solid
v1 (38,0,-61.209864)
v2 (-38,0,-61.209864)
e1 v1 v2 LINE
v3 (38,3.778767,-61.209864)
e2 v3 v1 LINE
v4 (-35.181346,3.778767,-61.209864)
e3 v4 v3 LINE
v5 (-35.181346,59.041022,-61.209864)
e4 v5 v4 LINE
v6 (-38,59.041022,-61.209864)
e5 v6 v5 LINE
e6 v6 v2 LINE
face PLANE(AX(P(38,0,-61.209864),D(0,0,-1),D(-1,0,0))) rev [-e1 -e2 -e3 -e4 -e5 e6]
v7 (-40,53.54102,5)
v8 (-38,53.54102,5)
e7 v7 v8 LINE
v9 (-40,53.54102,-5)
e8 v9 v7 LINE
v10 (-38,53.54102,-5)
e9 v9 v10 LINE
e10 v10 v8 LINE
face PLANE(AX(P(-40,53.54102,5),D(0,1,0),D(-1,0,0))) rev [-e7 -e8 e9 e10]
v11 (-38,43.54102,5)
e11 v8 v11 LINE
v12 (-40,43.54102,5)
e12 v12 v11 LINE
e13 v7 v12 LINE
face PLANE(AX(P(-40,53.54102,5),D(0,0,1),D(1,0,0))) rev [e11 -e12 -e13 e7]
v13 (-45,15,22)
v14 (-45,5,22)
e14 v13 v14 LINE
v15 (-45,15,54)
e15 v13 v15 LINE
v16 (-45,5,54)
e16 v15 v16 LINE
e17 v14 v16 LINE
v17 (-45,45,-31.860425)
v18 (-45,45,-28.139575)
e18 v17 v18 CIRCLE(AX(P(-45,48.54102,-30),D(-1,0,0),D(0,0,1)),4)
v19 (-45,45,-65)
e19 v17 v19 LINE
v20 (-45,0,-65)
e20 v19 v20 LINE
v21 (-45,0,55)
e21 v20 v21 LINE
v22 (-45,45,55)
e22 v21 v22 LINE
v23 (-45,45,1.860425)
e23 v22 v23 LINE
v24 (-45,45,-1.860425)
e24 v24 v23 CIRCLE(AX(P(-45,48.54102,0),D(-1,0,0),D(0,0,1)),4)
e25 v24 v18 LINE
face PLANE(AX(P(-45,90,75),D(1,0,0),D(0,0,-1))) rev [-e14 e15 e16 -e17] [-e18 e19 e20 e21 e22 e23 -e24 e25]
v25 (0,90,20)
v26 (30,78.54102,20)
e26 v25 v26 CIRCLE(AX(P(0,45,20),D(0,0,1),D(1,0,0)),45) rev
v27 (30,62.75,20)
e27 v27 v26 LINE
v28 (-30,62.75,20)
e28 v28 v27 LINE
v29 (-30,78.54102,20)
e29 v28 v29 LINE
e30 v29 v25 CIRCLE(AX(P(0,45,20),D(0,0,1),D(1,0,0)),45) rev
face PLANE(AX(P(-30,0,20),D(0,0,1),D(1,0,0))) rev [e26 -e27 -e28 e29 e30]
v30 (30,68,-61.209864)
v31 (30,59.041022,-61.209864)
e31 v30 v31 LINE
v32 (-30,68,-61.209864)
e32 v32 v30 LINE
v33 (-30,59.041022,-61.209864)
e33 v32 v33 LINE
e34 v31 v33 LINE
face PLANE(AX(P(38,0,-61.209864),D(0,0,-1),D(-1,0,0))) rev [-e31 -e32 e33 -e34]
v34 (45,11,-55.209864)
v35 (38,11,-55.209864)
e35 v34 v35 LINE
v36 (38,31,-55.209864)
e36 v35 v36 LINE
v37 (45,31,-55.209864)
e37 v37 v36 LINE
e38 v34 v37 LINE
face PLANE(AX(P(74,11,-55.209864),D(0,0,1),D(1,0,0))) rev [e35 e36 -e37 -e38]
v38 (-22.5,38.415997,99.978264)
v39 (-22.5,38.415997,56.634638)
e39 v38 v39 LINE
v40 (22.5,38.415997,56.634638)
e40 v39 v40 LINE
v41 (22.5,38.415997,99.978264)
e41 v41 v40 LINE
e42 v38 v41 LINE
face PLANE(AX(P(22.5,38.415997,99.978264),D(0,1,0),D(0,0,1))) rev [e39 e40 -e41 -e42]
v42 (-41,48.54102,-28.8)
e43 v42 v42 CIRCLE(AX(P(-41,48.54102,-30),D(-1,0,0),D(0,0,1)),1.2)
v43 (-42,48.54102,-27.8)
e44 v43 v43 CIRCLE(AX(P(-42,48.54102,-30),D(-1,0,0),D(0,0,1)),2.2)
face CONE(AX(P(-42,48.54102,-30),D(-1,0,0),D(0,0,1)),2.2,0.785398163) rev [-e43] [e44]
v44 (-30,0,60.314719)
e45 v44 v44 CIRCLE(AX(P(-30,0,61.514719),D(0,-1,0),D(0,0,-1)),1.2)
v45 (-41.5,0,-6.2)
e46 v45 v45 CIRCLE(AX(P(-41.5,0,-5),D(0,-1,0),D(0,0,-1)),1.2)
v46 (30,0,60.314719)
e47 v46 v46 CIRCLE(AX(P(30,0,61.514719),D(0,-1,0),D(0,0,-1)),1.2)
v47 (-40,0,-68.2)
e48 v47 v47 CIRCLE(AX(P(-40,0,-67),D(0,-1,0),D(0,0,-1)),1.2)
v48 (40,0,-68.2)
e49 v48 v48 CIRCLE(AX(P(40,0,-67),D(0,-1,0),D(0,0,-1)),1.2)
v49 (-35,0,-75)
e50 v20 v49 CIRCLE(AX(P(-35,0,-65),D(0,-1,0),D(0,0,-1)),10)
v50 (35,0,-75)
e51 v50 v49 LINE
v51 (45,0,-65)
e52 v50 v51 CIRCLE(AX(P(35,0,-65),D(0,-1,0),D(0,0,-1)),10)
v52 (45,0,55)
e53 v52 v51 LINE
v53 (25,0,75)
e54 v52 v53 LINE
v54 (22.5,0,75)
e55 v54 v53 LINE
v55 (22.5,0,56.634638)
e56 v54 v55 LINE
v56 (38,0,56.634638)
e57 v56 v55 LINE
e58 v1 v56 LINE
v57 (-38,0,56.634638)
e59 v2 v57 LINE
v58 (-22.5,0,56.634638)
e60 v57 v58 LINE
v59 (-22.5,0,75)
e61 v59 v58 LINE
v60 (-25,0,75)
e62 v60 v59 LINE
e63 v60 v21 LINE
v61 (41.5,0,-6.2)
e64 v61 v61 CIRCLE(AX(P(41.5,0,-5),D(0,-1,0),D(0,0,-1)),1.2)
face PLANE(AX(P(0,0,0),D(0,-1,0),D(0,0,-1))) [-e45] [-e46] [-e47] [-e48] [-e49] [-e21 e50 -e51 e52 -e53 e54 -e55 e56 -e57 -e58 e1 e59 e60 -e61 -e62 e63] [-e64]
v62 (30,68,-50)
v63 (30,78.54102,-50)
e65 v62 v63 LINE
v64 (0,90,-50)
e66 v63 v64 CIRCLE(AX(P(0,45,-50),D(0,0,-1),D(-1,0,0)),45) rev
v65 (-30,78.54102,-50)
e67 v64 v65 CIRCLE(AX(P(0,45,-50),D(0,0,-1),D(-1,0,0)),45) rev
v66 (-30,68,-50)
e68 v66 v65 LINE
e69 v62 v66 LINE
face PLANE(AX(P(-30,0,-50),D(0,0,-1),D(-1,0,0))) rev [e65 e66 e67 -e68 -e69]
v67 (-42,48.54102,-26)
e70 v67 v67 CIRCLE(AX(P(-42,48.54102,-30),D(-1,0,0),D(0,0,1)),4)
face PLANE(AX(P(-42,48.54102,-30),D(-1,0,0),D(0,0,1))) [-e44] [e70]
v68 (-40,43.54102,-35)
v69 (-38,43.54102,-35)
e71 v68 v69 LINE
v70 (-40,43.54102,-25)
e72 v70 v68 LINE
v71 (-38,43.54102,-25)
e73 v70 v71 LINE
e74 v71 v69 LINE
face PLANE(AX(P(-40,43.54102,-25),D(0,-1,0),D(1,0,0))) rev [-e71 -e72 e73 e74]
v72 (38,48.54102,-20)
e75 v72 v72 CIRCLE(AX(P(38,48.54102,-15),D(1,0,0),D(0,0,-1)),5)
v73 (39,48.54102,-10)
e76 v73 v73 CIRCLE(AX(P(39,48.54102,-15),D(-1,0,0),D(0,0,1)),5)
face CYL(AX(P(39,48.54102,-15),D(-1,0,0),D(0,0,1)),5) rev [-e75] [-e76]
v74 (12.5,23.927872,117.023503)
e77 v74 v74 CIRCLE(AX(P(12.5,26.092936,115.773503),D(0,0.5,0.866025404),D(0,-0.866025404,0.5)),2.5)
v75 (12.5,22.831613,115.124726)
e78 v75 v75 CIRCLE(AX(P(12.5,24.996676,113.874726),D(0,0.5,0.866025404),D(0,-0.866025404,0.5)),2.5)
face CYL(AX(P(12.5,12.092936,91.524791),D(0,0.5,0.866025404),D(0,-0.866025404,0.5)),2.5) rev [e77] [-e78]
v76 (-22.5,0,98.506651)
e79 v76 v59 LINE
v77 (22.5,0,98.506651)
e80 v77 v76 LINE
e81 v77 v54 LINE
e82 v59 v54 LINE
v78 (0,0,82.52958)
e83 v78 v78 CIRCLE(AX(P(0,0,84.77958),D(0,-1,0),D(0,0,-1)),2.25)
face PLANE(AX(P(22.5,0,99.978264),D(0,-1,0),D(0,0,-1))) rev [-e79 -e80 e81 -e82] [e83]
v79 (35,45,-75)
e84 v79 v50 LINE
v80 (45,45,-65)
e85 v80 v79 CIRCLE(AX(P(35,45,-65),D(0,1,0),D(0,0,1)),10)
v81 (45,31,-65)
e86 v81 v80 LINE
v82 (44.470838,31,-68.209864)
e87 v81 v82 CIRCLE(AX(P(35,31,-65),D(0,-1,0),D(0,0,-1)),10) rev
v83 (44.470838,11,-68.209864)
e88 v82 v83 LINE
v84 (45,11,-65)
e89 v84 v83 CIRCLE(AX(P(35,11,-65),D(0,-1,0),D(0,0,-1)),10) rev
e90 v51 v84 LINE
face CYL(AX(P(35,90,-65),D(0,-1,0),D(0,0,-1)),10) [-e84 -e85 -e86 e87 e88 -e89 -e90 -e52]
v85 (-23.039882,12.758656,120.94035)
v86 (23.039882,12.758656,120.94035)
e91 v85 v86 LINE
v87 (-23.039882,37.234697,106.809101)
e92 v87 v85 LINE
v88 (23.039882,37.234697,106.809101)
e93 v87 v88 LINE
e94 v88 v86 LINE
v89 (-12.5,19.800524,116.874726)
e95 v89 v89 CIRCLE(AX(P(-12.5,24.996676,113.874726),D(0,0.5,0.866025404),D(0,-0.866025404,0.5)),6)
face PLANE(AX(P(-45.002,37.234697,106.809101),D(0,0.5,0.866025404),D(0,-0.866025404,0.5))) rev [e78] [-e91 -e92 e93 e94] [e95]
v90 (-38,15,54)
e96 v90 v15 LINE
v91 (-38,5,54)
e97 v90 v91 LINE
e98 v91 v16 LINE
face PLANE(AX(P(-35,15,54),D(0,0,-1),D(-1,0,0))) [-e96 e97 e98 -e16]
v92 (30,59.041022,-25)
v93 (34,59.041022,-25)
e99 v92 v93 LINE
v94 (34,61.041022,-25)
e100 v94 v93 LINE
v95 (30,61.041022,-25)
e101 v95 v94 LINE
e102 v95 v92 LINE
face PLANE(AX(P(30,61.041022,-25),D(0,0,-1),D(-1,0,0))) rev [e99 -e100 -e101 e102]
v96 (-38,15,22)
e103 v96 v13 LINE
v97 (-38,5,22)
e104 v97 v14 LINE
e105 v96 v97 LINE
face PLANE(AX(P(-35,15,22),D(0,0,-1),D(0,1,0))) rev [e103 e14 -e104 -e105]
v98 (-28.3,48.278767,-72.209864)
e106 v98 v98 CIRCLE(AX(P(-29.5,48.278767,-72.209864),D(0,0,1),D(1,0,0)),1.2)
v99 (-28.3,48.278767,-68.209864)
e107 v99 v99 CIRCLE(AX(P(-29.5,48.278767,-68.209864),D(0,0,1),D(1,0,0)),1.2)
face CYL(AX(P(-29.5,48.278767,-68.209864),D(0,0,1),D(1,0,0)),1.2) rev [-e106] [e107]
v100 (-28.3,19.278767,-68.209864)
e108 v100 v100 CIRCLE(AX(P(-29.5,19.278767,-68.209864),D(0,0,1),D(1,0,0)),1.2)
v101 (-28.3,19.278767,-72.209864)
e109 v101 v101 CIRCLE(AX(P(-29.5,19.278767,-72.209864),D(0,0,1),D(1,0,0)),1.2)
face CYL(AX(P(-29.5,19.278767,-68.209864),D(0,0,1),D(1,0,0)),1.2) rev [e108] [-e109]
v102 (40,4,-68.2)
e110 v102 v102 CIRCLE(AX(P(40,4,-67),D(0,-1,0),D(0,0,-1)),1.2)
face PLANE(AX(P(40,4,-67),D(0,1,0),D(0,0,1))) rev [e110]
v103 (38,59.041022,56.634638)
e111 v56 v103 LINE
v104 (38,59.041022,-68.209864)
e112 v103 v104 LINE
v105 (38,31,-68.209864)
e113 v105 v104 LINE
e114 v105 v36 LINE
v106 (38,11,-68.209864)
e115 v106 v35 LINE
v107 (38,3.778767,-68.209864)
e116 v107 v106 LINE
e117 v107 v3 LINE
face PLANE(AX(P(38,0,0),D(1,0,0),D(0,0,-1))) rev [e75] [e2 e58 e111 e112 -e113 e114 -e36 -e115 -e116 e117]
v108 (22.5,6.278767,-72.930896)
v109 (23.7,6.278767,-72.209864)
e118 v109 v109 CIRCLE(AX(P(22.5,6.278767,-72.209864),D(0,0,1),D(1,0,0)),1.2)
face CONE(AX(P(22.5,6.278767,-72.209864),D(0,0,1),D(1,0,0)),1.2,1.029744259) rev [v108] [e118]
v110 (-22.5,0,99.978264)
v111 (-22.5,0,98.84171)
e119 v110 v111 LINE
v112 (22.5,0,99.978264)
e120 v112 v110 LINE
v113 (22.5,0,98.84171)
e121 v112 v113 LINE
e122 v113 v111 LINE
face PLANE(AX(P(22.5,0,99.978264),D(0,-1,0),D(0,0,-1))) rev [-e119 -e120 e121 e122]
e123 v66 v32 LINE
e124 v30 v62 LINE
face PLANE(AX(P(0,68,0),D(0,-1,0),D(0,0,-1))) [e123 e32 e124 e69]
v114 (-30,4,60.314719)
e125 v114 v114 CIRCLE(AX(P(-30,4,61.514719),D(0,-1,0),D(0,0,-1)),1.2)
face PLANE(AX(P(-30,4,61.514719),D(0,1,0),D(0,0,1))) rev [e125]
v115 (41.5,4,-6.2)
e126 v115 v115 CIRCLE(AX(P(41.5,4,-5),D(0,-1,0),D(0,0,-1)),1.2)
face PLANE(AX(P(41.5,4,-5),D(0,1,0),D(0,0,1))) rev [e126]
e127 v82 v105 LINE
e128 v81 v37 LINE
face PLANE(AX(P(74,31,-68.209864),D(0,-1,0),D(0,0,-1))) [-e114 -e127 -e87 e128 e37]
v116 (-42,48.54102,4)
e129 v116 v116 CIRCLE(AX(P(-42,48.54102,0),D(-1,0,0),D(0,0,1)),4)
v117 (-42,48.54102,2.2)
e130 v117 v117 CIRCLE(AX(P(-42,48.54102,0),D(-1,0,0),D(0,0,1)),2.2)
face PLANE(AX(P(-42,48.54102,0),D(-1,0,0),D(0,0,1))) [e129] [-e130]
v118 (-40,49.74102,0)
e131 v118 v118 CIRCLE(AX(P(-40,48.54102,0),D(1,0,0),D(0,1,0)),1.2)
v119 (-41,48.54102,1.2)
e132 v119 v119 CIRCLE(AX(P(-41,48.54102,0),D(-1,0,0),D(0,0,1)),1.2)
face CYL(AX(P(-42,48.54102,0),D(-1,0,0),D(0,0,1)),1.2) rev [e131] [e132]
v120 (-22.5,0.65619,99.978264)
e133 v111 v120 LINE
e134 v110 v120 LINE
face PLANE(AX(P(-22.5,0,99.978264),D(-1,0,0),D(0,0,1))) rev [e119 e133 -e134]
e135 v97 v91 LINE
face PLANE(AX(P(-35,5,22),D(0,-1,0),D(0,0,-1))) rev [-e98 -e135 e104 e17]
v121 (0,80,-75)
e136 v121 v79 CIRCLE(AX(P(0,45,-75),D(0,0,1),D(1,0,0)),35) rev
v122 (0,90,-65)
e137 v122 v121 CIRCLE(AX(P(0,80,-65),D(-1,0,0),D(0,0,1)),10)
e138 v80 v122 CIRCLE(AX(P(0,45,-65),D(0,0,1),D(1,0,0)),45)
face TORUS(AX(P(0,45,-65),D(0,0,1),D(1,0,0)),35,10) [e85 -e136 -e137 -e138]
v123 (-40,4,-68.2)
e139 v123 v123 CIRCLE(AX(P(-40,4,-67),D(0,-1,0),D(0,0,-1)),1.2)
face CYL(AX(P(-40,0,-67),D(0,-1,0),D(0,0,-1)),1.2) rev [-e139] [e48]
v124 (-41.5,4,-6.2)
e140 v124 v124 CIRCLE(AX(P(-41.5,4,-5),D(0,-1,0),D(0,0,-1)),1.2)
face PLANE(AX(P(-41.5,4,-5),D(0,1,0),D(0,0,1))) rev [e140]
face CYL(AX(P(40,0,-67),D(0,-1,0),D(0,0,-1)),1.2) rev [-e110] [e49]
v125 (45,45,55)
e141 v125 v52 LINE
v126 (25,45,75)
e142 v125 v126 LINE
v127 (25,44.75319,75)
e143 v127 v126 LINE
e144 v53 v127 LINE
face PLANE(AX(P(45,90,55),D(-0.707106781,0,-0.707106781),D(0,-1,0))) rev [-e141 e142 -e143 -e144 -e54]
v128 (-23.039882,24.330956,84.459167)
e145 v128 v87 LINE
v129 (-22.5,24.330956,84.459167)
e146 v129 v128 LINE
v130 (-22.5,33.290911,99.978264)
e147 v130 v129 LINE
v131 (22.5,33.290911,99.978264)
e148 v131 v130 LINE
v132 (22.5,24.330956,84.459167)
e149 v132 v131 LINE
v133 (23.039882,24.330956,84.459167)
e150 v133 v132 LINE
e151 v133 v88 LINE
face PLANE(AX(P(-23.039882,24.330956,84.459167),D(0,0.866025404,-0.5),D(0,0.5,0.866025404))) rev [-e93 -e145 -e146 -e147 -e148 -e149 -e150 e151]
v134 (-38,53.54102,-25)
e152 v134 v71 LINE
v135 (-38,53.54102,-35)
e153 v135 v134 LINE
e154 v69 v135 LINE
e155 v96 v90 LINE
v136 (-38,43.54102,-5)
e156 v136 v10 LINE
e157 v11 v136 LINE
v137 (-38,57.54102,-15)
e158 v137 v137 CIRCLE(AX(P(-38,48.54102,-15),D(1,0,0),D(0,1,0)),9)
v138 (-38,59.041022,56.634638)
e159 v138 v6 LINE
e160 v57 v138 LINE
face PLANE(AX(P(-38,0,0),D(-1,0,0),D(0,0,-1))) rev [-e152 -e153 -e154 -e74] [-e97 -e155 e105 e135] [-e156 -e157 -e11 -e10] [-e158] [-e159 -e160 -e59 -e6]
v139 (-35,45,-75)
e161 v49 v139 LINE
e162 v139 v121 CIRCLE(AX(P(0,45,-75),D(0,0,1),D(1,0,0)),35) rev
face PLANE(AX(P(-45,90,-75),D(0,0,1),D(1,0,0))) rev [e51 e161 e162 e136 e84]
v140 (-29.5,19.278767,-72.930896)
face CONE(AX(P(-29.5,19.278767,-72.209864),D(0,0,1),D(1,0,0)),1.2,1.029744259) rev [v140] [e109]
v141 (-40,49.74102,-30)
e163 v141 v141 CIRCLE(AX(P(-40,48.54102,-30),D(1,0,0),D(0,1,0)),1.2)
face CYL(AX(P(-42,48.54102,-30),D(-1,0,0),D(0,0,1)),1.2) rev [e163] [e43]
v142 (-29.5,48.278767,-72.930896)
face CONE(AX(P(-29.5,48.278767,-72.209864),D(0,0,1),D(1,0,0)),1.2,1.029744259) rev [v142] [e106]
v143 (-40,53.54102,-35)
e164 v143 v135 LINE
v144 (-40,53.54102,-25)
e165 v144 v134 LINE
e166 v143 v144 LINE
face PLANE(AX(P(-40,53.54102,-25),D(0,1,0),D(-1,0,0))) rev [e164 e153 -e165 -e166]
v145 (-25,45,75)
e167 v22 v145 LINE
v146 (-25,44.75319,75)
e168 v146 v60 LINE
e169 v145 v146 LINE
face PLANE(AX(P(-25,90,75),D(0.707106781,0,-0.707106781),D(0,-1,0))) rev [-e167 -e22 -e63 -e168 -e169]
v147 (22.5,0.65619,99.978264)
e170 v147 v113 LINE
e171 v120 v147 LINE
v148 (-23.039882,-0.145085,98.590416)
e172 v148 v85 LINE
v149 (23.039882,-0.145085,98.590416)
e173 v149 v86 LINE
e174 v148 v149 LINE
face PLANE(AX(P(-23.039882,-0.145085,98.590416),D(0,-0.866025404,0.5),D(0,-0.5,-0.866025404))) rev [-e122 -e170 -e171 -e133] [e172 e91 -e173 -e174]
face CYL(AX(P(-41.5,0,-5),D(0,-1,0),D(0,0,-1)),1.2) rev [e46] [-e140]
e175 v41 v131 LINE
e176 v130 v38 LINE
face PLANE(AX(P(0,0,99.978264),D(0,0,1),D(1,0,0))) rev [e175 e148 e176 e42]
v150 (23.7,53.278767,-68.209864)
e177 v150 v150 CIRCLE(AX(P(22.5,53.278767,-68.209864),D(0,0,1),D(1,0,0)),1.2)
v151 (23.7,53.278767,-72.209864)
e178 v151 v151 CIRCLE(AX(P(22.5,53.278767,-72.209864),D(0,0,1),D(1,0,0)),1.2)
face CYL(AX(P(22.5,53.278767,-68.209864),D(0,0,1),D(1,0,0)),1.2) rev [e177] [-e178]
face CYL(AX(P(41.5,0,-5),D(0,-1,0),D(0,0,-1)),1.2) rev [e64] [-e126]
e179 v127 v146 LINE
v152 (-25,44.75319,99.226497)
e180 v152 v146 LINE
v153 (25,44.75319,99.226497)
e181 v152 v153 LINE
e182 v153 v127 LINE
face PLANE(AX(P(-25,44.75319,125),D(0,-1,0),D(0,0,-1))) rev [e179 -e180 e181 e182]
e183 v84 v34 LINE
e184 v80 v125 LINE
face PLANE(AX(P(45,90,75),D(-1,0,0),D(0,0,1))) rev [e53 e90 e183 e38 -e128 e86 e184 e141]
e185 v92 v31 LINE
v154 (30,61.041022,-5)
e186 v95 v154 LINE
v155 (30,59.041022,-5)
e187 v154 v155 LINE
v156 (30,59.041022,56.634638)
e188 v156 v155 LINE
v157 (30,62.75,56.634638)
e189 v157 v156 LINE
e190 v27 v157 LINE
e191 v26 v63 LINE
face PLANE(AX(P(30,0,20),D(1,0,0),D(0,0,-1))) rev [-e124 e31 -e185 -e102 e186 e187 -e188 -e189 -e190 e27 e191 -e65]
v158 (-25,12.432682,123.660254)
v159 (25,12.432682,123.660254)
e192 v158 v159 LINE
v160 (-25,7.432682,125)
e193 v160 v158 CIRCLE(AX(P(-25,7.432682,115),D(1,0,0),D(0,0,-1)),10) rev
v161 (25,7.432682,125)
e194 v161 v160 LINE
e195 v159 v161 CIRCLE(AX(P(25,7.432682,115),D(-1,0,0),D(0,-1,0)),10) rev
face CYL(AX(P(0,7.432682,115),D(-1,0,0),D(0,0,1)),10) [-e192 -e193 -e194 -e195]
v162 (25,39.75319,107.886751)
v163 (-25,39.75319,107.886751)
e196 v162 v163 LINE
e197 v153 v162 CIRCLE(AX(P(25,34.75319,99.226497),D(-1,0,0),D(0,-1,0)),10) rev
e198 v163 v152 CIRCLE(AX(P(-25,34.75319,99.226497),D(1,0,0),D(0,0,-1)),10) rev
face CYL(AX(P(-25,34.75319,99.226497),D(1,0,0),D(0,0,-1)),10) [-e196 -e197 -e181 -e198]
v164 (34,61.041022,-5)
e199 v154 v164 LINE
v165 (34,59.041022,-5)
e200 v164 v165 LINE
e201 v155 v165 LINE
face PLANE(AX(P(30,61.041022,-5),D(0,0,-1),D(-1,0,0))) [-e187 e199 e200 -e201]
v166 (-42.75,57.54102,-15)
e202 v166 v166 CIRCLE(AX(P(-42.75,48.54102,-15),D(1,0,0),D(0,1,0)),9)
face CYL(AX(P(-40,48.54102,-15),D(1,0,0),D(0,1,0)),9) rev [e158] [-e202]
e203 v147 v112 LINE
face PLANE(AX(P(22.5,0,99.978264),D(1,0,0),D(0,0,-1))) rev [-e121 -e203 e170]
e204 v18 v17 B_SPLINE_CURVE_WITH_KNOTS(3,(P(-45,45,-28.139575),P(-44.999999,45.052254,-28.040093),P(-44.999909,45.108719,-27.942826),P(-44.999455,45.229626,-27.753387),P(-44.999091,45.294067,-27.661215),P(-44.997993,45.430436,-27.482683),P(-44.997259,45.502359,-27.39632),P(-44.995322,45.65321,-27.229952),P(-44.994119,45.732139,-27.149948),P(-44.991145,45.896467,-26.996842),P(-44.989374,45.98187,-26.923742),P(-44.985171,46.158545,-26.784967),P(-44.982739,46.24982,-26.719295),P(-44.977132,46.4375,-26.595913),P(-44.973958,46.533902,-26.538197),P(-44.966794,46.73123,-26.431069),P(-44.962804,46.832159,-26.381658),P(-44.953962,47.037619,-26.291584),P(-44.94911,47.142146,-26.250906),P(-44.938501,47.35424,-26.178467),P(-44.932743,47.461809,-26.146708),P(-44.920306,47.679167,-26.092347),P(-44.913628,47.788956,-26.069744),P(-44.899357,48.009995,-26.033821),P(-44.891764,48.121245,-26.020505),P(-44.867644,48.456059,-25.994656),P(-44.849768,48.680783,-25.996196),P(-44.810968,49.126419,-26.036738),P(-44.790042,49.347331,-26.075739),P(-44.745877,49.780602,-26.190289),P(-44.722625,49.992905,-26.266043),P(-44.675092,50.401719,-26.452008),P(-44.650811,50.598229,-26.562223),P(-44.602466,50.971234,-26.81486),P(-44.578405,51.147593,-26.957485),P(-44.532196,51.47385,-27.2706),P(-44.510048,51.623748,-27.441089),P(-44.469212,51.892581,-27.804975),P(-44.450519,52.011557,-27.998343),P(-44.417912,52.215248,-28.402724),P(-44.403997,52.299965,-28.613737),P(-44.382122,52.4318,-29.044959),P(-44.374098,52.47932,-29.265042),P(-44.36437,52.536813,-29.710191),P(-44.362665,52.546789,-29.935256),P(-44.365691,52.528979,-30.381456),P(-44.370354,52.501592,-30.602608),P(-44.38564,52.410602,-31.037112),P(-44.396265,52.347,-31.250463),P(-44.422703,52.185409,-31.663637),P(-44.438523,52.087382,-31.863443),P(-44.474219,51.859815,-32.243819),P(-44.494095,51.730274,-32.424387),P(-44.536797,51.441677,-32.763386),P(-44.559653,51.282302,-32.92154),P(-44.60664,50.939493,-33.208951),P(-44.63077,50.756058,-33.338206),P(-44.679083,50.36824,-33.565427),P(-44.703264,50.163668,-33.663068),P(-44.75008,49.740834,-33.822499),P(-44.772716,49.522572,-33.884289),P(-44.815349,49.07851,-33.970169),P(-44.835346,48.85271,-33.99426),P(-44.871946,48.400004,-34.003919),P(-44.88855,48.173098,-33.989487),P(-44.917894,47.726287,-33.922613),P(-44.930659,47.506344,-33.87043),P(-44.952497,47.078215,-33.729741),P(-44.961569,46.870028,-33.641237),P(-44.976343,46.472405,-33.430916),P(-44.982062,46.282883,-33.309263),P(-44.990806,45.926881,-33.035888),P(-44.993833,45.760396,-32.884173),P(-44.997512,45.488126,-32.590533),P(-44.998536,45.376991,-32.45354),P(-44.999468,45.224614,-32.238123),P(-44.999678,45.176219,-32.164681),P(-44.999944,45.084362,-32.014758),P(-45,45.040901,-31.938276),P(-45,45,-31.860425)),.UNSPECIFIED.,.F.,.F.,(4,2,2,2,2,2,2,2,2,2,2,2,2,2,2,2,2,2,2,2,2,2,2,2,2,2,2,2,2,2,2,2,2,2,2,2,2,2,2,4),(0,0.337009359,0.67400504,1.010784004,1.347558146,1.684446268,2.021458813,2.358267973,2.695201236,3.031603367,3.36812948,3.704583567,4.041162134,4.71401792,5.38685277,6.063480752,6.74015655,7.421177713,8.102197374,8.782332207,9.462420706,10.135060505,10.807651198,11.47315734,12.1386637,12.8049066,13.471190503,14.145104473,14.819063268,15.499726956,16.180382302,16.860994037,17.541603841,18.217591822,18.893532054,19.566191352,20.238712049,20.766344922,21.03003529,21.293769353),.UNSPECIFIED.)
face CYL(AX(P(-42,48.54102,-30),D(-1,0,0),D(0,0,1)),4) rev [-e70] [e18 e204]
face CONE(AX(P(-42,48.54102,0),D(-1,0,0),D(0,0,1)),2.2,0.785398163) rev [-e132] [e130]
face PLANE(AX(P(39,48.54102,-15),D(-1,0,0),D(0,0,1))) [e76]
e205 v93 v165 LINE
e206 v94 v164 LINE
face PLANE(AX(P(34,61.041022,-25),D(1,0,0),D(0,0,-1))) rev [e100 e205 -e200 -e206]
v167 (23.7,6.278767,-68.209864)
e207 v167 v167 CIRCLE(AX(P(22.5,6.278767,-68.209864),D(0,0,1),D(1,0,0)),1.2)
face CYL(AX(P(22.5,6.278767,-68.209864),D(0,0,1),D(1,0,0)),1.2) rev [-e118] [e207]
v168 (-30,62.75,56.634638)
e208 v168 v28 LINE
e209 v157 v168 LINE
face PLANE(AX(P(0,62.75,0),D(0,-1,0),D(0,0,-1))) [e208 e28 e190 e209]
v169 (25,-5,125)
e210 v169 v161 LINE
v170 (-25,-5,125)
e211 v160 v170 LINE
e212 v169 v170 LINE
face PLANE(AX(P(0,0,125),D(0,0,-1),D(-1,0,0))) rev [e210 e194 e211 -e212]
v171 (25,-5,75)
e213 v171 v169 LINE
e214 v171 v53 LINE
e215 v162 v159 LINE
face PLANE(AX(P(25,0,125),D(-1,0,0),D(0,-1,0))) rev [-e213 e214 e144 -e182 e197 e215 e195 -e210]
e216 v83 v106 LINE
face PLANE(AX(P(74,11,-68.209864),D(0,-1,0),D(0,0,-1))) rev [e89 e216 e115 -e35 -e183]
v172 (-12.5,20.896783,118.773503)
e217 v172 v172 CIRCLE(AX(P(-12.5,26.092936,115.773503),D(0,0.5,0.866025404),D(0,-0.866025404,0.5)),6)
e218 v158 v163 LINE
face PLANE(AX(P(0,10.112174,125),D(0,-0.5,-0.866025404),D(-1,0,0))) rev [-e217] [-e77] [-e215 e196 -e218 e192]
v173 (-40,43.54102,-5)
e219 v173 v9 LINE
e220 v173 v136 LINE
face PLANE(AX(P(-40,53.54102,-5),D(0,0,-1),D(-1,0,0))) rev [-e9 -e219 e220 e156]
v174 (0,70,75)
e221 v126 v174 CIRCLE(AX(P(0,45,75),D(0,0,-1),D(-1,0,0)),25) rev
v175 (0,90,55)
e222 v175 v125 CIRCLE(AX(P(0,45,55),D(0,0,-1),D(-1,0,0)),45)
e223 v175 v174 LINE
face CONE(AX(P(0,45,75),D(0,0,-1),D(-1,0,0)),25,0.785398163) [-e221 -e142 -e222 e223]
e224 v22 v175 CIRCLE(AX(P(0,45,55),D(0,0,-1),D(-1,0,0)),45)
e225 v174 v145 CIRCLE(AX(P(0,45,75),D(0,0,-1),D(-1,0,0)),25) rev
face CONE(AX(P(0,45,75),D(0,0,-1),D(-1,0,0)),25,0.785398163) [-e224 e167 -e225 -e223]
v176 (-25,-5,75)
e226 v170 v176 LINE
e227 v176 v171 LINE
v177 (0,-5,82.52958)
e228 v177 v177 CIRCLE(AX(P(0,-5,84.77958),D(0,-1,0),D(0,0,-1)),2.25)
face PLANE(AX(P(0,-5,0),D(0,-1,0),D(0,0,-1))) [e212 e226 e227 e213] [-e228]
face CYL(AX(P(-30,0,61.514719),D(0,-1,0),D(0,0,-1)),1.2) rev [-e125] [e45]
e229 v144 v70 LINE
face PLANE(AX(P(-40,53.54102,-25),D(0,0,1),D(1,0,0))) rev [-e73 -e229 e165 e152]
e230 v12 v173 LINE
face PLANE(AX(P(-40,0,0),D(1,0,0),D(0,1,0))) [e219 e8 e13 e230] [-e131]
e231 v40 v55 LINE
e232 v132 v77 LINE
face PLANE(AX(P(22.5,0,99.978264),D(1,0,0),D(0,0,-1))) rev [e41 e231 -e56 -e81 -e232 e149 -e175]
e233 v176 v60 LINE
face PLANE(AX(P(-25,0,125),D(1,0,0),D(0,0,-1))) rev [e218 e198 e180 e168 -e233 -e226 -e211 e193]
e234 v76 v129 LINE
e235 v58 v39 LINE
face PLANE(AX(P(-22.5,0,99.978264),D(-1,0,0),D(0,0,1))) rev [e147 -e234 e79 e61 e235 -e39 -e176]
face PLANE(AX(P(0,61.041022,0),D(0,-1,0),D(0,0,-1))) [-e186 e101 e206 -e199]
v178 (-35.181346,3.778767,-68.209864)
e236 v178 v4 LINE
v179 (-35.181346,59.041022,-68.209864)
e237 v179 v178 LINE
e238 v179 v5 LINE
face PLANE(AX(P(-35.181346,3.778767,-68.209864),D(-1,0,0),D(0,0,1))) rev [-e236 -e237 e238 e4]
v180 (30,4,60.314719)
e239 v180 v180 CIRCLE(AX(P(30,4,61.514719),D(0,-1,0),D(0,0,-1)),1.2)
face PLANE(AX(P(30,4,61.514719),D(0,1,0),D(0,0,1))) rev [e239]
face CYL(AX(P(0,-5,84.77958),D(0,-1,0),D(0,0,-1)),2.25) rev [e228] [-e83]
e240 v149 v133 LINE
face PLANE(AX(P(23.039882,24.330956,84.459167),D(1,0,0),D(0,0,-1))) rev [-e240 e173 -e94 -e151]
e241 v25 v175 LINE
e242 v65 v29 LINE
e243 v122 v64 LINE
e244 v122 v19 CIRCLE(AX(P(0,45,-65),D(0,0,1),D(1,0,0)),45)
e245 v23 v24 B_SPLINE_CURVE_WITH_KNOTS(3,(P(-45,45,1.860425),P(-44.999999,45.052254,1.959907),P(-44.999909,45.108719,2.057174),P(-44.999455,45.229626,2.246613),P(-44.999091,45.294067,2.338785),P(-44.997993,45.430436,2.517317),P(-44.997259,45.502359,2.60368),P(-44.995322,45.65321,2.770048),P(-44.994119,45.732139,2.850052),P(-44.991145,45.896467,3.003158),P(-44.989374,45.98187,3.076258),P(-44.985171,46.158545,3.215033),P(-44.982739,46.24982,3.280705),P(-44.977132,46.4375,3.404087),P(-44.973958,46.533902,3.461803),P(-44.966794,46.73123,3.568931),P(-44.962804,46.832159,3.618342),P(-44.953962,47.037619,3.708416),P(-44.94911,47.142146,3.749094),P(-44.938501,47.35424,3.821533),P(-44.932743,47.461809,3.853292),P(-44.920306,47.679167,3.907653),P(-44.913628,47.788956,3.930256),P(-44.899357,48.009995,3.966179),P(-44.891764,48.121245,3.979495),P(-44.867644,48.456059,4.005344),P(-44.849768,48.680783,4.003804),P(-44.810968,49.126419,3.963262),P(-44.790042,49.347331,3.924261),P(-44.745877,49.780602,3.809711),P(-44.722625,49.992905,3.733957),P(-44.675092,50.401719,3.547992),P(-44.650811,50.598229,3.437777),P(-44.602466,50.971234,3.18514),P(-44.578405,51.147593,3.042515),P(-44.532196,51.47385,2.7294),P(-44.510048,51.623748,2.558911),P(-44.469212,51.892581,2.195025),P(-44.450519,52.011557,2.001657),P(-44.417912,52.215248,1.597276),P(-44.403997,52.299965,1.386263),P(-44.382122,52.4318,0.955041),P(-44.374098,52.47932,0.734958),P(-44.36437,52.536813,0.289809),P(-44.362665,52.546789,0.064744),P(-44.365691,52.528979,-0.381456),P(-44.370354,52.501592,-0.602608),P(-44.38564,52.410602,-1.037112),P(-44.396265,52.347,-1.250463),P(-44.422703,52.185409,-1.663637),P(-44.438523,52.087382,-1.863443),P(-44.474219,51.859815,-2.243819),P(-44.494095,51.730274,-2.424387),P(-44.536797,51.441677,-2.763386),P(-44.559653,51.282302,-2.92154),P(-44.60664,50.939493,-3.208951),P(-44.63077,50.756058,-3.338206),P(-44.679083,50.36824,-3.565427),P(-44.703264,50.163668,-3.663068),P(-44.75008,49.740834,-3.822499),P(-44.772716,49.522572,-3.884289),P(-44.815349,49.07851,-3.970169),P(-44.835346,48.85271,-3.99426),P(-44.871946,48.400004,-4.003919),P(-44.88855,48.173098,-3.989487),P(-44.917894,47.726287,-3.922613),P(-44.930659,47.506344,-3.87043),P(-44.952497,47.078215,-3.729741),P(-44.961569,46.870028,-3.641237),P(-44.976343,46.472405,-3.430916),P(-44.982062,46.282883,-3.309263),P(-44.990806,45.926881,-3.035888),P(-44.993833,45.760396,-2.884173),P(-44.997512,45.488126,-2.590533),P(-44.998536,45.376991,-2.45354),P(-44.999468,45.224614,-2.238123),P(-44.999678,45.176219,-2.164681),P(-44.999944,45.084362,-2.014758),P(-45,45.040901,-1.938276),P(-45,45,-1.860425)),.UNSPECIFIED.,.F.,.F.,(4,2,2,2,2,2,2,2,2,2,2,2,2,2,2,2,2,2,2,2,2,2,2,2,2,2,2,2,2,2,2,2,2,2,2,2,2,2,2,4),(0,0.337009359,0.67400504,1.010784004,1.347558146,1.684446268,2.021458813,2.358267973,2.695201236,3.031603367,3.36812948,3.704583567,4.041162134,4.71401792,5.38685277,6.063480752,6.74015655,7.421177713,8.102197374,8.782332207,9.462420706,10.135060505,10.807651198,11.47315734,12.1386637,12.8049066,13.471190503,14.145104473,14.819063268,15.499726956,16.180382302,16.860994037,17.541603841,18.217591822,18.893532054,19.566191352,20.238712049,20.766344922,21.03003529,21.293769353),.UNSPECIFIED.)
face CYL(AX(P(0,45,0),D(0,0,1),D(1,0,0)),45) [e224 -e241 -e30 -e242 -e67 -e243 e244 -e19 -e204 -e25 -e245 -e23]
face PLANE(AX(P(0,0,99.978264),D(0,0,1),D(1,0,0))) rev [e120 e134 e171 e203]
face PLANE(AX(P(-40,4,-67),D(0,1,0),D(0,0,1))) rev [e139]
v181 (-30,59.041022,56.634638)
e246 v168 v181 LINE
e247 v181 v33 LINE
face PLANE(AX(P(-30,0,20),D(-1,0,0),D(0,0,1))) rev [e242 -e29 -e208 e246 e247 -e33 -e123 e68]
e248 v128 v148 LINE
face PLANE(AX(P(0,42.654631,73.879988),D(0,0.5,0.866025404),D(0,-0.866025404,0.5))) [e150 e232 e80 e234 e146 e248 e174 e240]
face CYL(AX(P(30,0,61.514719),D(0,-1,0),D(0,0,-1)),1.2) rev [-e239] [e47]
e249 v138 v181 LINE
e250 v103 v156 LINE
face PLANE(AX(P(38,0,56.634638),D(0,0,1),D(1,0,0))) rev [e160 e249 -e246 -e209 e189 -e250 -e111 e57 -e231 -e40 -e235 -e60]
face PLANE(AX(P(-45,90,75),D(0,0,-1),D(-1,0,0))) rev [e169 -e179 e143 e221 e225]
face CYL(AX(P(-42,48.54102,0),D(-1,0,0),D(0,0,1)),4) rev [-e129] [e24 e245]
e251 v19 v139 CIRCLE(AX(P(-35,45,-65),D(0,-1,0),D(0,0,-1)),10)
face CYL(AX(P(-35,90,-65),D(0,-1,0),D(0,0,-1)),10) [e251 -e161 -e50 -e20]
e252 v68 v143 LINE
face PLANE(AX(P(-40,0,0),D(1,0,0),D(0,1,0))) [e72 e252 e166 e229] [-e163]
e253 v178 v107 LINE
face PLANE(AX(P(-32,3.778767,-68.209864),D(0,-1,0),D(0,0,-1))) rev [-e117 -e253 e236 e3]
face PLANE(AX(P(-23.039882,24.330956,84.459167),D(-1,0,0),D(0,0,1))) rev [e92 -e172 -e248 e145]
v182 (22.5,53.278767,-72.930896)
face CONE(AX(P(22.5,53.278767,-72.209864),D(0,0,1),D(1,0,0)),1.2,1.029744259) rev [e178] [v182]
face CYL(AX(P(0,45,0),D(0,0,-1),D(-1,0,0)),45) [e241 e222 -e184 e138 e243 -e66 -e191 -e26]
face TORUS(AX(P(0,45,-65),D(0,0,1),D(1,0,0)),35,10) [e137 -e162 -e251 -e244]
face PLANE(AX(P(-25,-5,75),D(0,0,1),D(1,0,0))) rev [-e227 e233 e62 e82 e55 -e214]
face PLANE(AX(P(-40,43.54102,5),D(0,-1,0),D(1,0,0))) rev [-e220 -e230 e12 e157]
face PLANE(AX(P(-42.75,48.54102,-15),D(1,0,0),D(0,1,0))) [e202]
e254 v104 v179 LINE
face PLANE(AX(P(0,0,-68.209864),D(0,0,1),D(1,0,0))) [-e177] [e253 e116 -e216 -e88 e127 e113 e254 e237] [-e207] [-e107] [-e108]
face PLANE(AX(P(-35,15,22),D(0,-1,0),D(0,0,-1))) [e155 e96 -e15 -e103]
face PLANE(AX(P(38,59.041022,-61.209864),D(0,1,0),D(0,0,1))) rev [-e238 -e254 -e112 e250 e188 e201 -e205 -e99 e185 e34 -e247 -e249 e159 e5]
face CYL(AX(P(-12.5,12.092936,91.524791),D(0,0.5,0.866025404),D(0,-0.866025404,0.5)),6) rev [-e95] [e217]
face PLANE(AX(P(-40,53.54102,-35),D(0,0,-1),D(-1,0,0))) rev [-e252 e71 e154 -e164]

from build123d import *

# Parameters (mm, degrees)
SCHIZZO1_W                             = 90
SCHIZZO1_H                             = 150
ESTRUSIONE_ESTRUSIONE1_DEPTH           = 90
SCHIZZO4_W                             = 60
SCHIZZO4_H                             = 70
TAGLIO_ESTRUSIONE2_DEPTH               = 90
RACCORDO5_R                            = 45
RACCORDO6_R                            = 45
SMUSSO2_SIZE                           = 20
SCHIZZO7_W                             = 50
SCHIZZO7_H                             = 44.753189799
ESTRUSIONE_ESTRUSIONE2_DEPTH           = 50
SMUSSO3_SIZE                           = 20
SMUSSO3_SIZE2                          = 34.641016151
RACCORDO7_R                            = 10
RACCORDO8_R                            = 10
SCHIZZO9_W                             = 50
SCHIZZO9_H                             = 50
ESTRUSIONE_ESTRUSIONE3_DEPTH           = 5
RACCORDO9_R                            = 10
SCHIZZO13_W                            = 45
SCHIZZO13_H                            = 38.415996799
TAGLIO_ESTRUSIONE3_DEPTH               = 79.978264331
SCHIZZO14_W                            = 117.844501366
SCHIZZO14_H                            = 59.041021869
TAGLIO_ESTRUSIONE4_DEPTH               = 8
SCHIZZO18_R                            = 5
TAGLIO_ESTRUSIONE5_DEPTH               = 9
SCHIZZO16_W                            = 4
SCHIZZO16_H                            = 20
TAGLIO_ESTRUSIONE7_DEPTH               = 2
SCHIZZO23_W                            = 76
SCHIZZO23_H                            = 117.844501366
TAGLIO_ESTRUSIONE8_DEPTH               = 38
FORO_PER_VITE_M2_2_D                   = 2.4
FORO_PER_VITE_M2_2_DEPTH               = 4
FORO_PER_VITE_M4_1_D                   = 4.5
FORO_PER_VITE_M4_1_DEPTH               = 10
SCHIZZO29_W                            = 60
SCHIZZO29_H                            = 11.209863528
TAGLIO_ESTRUSIONE9_DEPTH               = 30
SCHIZZO30_W                            = 70
SCHIZZO30_H                            = 52
TAGLIO_ESTRUSIONE10_DEPTH              = 7
FORO_PER_VITE_M2_3_D                   = 2.4
FORO_PER_VITE_M2_3_DEPTH               = 4
FORO_PER_VITE_M2_3_TIP                 = 0.721032743
SCHIZZO33_W                            = 13
SCHIZZO33_H                            = 20
TAGLIO_ESTRUSIONE11_DEPTH              = 36
SCHIZZO36_W                            = 46.07976418
SCHIZZO36_H                            = 28.262497783
TAGLIO_ESTRUSIONE12_DEPTH              = 28
ESTRUSIONE_ESTRUSIONE4_REACH           = 170.388
SCHIZZO38_R                            = 6
SCHIZZO38_R_2                          = 2.5
TAGLIO_ESTRUSIONE13_DEPTH              = 28
SCHIZZO39_R                            = 9
SCHIZZO39_W                            = 10
SCHIZZO39_H                            = 10
TAGLIO_ESTRUSIONE14_DEPTH              = 2
SCHIZZO40_W                            = 32
SCHIZZO40_H                            = 10
TAGLIO_ESTRUSIONE15_DEPTH              = 10
SCHIZZO42_R                            = 4
TAGLIO_ESTRUSIONE16_DEPTH              = 3
FORO_SVASATO_PER_VITE_M2_3_D           = 2.4
FORO_SVASATO_PER_VITE_M2_3_DEPTH       = 6
FORO_SVASATO_PER_VITE_M2_3_CSINK_D     = 4.4
FORO_SVASATO_PER_VITE_M2_3_CSINK_ANGLE = 90
FORO_SVASATO_PER_VITE_M2_3_TIP         = 0.721032743
TAGLIO_ESTRUSIONE18_DEPTH              = 7
SCHIZZO53_R                            = 9
TAGLIO_ESTRUSIONE19_DEPTH              = 2.75
SCHIZZO54_W                            = 60
SCHIZZO54_H                            = 36.634637838
TAGLIO_ESTRUSIONE20_DEPTH              = 24.75


with BuildPart() as part:
    # Schizzo1 → Estrusione-Estrusione1 (new body)
    with BuildSketch(Plane(origin=(0, 0, 0), x_dir=(1, 0, 0), z_dir=(0, 1, 0))):
        Rectangle(SCHIZZO1_W, SCHIZZO1_H)
    extrude(amount=ESTRUSIONE_ESTRUSIONE1_DEPTH)

    # Schizzo4 → Taglio-Estrusione2 (cut)
    with BuildSketch(Plane(origin=(0, 90, 0), x_dir=(1, 0, 0), z_dir=(0, 1, 0))):
        with Locations((0, 15)):
            Rectangle(SCHIZZO4_W, SCHIZZO4_H)
    extrude(amount=-TAGLIO_ESTRUSIONE2_DEPTH, mode=Mode.SUBTRACT)

    # Raccordo5
    # the kernel refuses this fillet: 45 mm, written as the material it takes off along each edge
    with BuildSketch(Plane(origin=(-45, 90, -187.5), x_dir=(0, -1, 0), z_dir=(0, 0, 1))) as raccordo5_piece_1:
        with BuildLine():
            CenterArc((RACCORDO5_R, RACCORDO5_R), RACCORDO5_R, 180, 90)
            Line((0, RACCORDO5_R), (0, 0))
            Line((0, 0), (RACCORDO5_R, 0))
        make_face()
    extrude(amount=375, mode=Mode.SUBTRACT)

    # Raccordo6
    # the kernel refuses this fillet: 45 mm, written as the material it takes off along each edge
    with BuildSketch(Plane(origin=(45, 90, 187.5), x_dir=(0, -1, 0), z_dir=(0, 0, -1))) as raccordo6_piece_1:
        with BuildLine():
            CenterArc((RACCORDO6_R, RACCORDO6_R), RACCORDO6_R, 180, 90)
            Line((0, RACCORDO6_R), (0, 0))
            Line((0, 0), (RACCORDO6_R, 0))
        make_face()
    extrude(amount=375, mode=Mode.SUBTRACT)

    # Smusso2
    smusso2_edges = [part.edges().sort_by_distance(p)[0] for p in [
        (-45, 22.5, 75),
        (0, 90, 75),
        (45, 22.5, 75),
        (0, 90, 75),
    ]]
    chamfer(smusso2_edges, length=SMUSSO2_SIZE)

    # Schizzo7 → Estrusione-Estrusione2 (add)
    with BuildSketch(Plane.XY.offset(75)):
        with Locations((0, 22.3765949)):
            Rectangle(SCHIZZO7_W, SCHIZZO7_H)
    extrude(amount=ESTRUSIONE_ESTRUSIONE2_DEPTH)

    # Smusso3
    smusso3_edges = [part.edges().sort_by_distance(p)[0] for p in [
        (0, 44.753189799, 125),
    ]]
    smusso3_side = [part.faces().sort_by_distance(p)[0] for p in [
        (0, 44.753189799, 100),
    ]]
    chamfer(smusso3_edges, length=SMUSSO3_SIZE, length2=SMUSSO3_SIZE2, reference=smusso3_side[0])

    # Raccordo7
    raccordo7_edges = [part.edges().sort_by_distance(p)[0] for p in [
        (0, 44.753189799, 105),
    ]]
    fillet(raccordo7_edges, radius=RACCORDO7_R)

    # Raccordo8
    raccordo8_edges = [part.edges().sort_by_distance(p)[0] for p in [
        (0, 10.112173648, 125),
    ]]
    fillet(raccordo8_edges, radius=RACCORDO8_R)

    # Schizzo9 → Estrusione-Estrusione3 (add)
    with BuildSketch(Plane.XZ):
        with Locations((0, 100)):
            Rectangle(SCHIZZO9_W, SCHIZZO9_H)
    extrude(amount=ESTRUSIONE_ESTRUSIONE3_DEPTH)

    # Raccordo9
    raccordo9_edges = [part.edges().sort_by_distance(p)[0] for p in [
        (-45, 22.5, -75),
        (0, 90, -75),
        (45, 22.5, -75),
        (0, 90, -75),
    ]]
    fillet(raccordo9_edges, radius=RACCORDO9_R)

    # Schizzo13 → Taglio-Estrusione3 (cut)
    with BuildSketch(Plane(origin=(0, 0, 20), x_dir=(-1, 0, 0), z_dir=(0, 0, -1))):
        with Locations((0, 19.2079984)):
            Rectangle(SCHIZZO13_W, SCHIZZO13_H)
    extrude(amount=-TAGLIO_ESTRUSIONE3_DEPTH, mode=Mode.SUBTRACT)

    # Schizzo14 → Taglio-Estrusione4 (cut)
    with BuildSketch(Plane.ZY.offset(-30)):
        with Locations((-2.287612845, 29.520510935)):
            Rectangle(SCHIZZO14_W, SCHIZZO14_H)
    taglio_estrusione4 = extrude(amount=-TAGLIO_ESTRUSIONE4_DEPTH, mode=Mode.SUBTRACT)

    # Specchia1: Taglio-Estrusione4 across plane
    add(taglio_estrusione4.mirror(Plane(origin=(0, 0, 0), x_dir=(0, 0, 1), z_dir=(1, 0, 0))), mode=Mode.SUBTRACT)

    # Schizzo18 → Taglio-Estrusione5 (cut)
    with BuildSketch(Plane.ZY.offset(-30)):
        with Locations((-15, 48.541019662)):
            Circle(SCHIZZO18_R)
    extrude(amount=-TAGLIO_ESTRUSIONE5_DEPTH, mode=Mode.SUBTRACT)

    # Schizzo16 → Taglio-Estrusione7 (cut)
    with BuildSketch(Plane.XZ.offset(-59.041021869)):
        with Locations((32, -15)):
            Rectangle(SCHIZZO16_W, SCHIZZO16_H)
    extrude(amount=-TAGLIO_ESTRUSIONE7_DEPTH, mode=Mode.SUBTRACT)

    # Schizzo23 → Taglio-Estrusione8 (cut)
    with BuildSketch(Plane.XZ):
        with Locations((0, -2.287612845)):
            Rectangle(SCHIZZO23_W, SCHIZZO23_H)
    extrude(amount=-TAGLIO_ESTRUSIONE8_DEPTH, mode=Mode.SUBTRACT)

    # Foro per Vite M2-2
    with Locations(Plane(origin=(0, 0, 0), x_dir=(-1, 0, 0), z_dir=(0, -1, 0))):
        with Locations((40, 67), (30, -61.514718626), (-30, -61.514718626), (-40, 67), (-41.5, 5), (41.5, 5)):
            Hole(FORO_PER_VITE_M2_2_D / 2, depth=FORO_PER_VITE_M2_2_DEPTH)

    # Foro per Vite M4-1
    with Locations(Plane(origin=(0, -5, 84.779580177), x_dir=(0, 0, -1), z_dir=(0, -1, 0))):
        with Locations((0, 0)):
            Hole(FORO_PER_VITE_M4_1_D / 2, depth=FORO_PER_VITE_M4_1_DEPTH)

    # Schizzo29 → Taglio-Estrusione9 (cut)
    with BuildSketch(Plane.XZ.offset(-38)):
        with Locations((0, -55.604931764)):
            Rectangle(SCHIZZO29_W, SCHIZZO29_H)
    extrude(amount=-TAGLIO_ESTRUSIONE9_DEPTH, mode=Mode.SUBTRACT)

    # Schizzo30 → Taglio-Estrusione10 (cut)
    with BuildSketch(Plane.XY.offset(-61.209863528)):
        with Locations((3, 29.778767455)):
            Rectangle(SCHIZZO30_W, SCHIZZO30_H)
    extrude(amount=-TAGLIO_ESTRUSIONE10_DEPTH, mode=Mode.SUBTRACT)

    # Foro per Vite M2-3
    with Locations(Plane.XY.offset(-68.209863528)):
        with Locations((-29.5, 48.278767455), (-29.5, 19.278767455), (22.5, 6.278767455), (22.5, 53.278767455)):
            Hole(FORO_PER_VITE_M2_3_D / 2, depth=FORO_PER_VITE_M2_3_DEPTH)
            with Locations((0, 0, -(FORO_PER_VITE_M2_3_DEPTH + FORO_PER_VITE_M2_3_TIP / 2))):  # 118° drill point
                Cone(0, FORO_PER_VITE_M2_3_D / 2, FORO_PER_VITE_M2_3_TIP, mode=Mode.SUBTRACT)

    # Schizzo33 → Taglio-Estrusione11 (cut)
    with BuildSketch(Plane.ZY.offset(-38)):
        with Locations((-61.709863528, 21)):
            Rectangle(SCHIZZO33_W, SCHIZZO33_H)
    extrude(amount=-TAGLIO_ESTRUSIONE11_DEPTH, mode=Mode.SUBTRACT)

    # Schizzo36 → Taglio-Estrusione12 (cut)
    with BuildSketch(Plane(origin=(0, 56.654631148, 98.128699633), x_dir=(1, 0, 0), z_dir=(0, 0.5000000000000012, 0.8660254037844378))):
        with Locations((0, -35.289606117)):
            Rectangle(SCHIZZO36_W, SCHIZZO36_H)
    extrude(amount=-TAGLIO_ESTRUSIONE12_DEPTH, mode=Mode.SUBTRACT)

    # Schizzo37 → Estrusione-Estrusione4 (add, up to next)
    with BuildSketch(Plane.ZY.offset(-23.03988209), mode=Mode.PRIVATE) as estrusione_estrusione4_sk1:
        Polygon((122.839127138, 13.854915234), (108.707878246, 38.330956288), (106.809101084, 37.234696782), (120.940349975, 12.758655728), align=None)
    estrusione_estrusione4_tool1 = extrude(estrusione_estrusione4_sk1.sketch, amount=ESTRUSIONE_ESTRUSIONE4_REACH, mode=Mode.PRIVATE) - part.part
    add(estrusione_estrusione4_tool1.solids().sort_by_distance((23.039882, 25.544806, 114.824114))[0])

    # Schizzo38 → Taglio-Estrusione13 (cut)
    with BuildSketch(Plane(origin=(0, 56.654631148, 98.128699633), x_dir=(1, 0, 0), z_dir=(0, 0.5000000000000013, 0.8660254037844379))):
        with Locations(Location((-12.5, -35.289606117, 0), (0, 0, 270))):
            Circle(SCHIZZO38_R)
        with Locations(Location((12.5, -35.289606117, 0), (0, 0, 270))):
            Circle(SCHIZZO38_R_2)
    extrude(amount=-TAGLIO_ESTRUSIONE13_DEPTH, mode=Mode.SUBTRACT)

    # Schizzo39 → Taglio-Estrusione14 (cut)
    with BuildSketch(Plane(origin=(-38, 0, 0), x_dir=(0, 0, -1), z_dir=(1, 0, 0))):
        with Locations(Location((15, 48.541019662, 0), (0, 0, 90))):
            Circle(SCHIZZO39_R)
        with Locations((0, 48.541019662)):
            Rectangle(SCHIZZO39_W, SCHIZZO39_H)
        with Locations((30, 48.541019662)):
            Rectangle(SCHIZZO39_W, SCHIZZO39_H)
    extrude(amount=-TAGLIO_ESTRUSIONE14_DEPTH, mode=Mode.SUBTRACT)

    # Schizzo40 → Taglio-Estrusione15 (cut)
    with BuildSketch(Plane.ZY.offset(45)):
        with Locations((38, 10)):
            Rectangle(SCHIZZO40_W, SCHIZZO40_H)
    extrude(amount=-TAGLIO_ESTRUSIONE15_DEPTH, mode=Mode.SUBTRACT)

    # Schizzo42 → Taglio-Estrusione16 (cut)
    with BuildSketch(Plane.ZY.offset(45)):
        with Locations((-30, 48.541019662)):
            Circle(SCHIZZO42_R)
        with Locations((0, 48.541019662)):
            Circle(SCHIZZO42_R)
    extrude(amount=-TAGLIO_ESTRUSIONE16_DEPTH, mode=Mode.SUBTRACT)

    # Foro svasato per Vite M2-3
    with Locations(Plane.ZY.offset(42)):
        with Locations((-30, 48.541019662), (0, 48.541019662)):
            CounterSinkHole(FORO_SVASATO_PER_VITE_M2_3_D / 2, FORO_SVASATO_PER_VITE_M2_3_CSINK_D / 2, depth=FORO_SVASATO_PER_VITE_M2_3_DEPTH, counter_sink_angle=FORO_SVASATO_PER_VITE_M2_3_CSINK_ANGLE)
            with Locations((0, 0, -(FORO_SVASATO_PER_VITE_M2_3_DEPTH + FORO_SVASATO_PER_VITE_M2_3_TIP / 2))):  # 118° drill point
                Cone(0, FORO_SVASATO_PER_VITE_M2_3_D / 2, FORO_SVASATO_PER_VITE_M2_3_TIP, mode=Mode.SUBTRACT)

    # Schizzo50 → Taglio-Estrusione18 (cut)
    with BuildSketch(Plane.XY.offset(-61.209863528)):
        Polygon((38, 59.041021869), (38, 55.778767455), (-32, 55.778767455), (-32, 3.778767455), (-35.181345979, 3.778767455), (-35.181345979, 59.041021869), align=None)
    extrude(amount=-TAGLIO_ESTRUSIONE18_DEPTH, mode=Mode.SUBTRACT)

    # Schizzo53 → Taglio-Estrusione19 (cut)
    with BuildSketch(Plane(origin=(-40, 0, 0), x_dir=(0, 0, -1), z_dir=(1, 0, 0))):
        with Locations(Location((15, 48.541019662, 0), (0, 0, 90))):
            Circle(SCHIZZO53_R)
    extrude(amount=-TAGLIO_ESTRUSIONE19_DEPTH, mode=Mode.SUBTRACT)

    # Schizzo54 → Taglio-Estrusione20 (cut)
    with BuildSketch(Plane.XZ.offset(-38)):
        with Locations((0, 38.317318919)):
            Rectangle(SCHIZZO54_W, SCHIZZO54_H)
    extrude(amount=-TAGLIO_ESTRUSIONE20_DEPTH, mode=Mode.SUBTRACT)


solid = part.part
